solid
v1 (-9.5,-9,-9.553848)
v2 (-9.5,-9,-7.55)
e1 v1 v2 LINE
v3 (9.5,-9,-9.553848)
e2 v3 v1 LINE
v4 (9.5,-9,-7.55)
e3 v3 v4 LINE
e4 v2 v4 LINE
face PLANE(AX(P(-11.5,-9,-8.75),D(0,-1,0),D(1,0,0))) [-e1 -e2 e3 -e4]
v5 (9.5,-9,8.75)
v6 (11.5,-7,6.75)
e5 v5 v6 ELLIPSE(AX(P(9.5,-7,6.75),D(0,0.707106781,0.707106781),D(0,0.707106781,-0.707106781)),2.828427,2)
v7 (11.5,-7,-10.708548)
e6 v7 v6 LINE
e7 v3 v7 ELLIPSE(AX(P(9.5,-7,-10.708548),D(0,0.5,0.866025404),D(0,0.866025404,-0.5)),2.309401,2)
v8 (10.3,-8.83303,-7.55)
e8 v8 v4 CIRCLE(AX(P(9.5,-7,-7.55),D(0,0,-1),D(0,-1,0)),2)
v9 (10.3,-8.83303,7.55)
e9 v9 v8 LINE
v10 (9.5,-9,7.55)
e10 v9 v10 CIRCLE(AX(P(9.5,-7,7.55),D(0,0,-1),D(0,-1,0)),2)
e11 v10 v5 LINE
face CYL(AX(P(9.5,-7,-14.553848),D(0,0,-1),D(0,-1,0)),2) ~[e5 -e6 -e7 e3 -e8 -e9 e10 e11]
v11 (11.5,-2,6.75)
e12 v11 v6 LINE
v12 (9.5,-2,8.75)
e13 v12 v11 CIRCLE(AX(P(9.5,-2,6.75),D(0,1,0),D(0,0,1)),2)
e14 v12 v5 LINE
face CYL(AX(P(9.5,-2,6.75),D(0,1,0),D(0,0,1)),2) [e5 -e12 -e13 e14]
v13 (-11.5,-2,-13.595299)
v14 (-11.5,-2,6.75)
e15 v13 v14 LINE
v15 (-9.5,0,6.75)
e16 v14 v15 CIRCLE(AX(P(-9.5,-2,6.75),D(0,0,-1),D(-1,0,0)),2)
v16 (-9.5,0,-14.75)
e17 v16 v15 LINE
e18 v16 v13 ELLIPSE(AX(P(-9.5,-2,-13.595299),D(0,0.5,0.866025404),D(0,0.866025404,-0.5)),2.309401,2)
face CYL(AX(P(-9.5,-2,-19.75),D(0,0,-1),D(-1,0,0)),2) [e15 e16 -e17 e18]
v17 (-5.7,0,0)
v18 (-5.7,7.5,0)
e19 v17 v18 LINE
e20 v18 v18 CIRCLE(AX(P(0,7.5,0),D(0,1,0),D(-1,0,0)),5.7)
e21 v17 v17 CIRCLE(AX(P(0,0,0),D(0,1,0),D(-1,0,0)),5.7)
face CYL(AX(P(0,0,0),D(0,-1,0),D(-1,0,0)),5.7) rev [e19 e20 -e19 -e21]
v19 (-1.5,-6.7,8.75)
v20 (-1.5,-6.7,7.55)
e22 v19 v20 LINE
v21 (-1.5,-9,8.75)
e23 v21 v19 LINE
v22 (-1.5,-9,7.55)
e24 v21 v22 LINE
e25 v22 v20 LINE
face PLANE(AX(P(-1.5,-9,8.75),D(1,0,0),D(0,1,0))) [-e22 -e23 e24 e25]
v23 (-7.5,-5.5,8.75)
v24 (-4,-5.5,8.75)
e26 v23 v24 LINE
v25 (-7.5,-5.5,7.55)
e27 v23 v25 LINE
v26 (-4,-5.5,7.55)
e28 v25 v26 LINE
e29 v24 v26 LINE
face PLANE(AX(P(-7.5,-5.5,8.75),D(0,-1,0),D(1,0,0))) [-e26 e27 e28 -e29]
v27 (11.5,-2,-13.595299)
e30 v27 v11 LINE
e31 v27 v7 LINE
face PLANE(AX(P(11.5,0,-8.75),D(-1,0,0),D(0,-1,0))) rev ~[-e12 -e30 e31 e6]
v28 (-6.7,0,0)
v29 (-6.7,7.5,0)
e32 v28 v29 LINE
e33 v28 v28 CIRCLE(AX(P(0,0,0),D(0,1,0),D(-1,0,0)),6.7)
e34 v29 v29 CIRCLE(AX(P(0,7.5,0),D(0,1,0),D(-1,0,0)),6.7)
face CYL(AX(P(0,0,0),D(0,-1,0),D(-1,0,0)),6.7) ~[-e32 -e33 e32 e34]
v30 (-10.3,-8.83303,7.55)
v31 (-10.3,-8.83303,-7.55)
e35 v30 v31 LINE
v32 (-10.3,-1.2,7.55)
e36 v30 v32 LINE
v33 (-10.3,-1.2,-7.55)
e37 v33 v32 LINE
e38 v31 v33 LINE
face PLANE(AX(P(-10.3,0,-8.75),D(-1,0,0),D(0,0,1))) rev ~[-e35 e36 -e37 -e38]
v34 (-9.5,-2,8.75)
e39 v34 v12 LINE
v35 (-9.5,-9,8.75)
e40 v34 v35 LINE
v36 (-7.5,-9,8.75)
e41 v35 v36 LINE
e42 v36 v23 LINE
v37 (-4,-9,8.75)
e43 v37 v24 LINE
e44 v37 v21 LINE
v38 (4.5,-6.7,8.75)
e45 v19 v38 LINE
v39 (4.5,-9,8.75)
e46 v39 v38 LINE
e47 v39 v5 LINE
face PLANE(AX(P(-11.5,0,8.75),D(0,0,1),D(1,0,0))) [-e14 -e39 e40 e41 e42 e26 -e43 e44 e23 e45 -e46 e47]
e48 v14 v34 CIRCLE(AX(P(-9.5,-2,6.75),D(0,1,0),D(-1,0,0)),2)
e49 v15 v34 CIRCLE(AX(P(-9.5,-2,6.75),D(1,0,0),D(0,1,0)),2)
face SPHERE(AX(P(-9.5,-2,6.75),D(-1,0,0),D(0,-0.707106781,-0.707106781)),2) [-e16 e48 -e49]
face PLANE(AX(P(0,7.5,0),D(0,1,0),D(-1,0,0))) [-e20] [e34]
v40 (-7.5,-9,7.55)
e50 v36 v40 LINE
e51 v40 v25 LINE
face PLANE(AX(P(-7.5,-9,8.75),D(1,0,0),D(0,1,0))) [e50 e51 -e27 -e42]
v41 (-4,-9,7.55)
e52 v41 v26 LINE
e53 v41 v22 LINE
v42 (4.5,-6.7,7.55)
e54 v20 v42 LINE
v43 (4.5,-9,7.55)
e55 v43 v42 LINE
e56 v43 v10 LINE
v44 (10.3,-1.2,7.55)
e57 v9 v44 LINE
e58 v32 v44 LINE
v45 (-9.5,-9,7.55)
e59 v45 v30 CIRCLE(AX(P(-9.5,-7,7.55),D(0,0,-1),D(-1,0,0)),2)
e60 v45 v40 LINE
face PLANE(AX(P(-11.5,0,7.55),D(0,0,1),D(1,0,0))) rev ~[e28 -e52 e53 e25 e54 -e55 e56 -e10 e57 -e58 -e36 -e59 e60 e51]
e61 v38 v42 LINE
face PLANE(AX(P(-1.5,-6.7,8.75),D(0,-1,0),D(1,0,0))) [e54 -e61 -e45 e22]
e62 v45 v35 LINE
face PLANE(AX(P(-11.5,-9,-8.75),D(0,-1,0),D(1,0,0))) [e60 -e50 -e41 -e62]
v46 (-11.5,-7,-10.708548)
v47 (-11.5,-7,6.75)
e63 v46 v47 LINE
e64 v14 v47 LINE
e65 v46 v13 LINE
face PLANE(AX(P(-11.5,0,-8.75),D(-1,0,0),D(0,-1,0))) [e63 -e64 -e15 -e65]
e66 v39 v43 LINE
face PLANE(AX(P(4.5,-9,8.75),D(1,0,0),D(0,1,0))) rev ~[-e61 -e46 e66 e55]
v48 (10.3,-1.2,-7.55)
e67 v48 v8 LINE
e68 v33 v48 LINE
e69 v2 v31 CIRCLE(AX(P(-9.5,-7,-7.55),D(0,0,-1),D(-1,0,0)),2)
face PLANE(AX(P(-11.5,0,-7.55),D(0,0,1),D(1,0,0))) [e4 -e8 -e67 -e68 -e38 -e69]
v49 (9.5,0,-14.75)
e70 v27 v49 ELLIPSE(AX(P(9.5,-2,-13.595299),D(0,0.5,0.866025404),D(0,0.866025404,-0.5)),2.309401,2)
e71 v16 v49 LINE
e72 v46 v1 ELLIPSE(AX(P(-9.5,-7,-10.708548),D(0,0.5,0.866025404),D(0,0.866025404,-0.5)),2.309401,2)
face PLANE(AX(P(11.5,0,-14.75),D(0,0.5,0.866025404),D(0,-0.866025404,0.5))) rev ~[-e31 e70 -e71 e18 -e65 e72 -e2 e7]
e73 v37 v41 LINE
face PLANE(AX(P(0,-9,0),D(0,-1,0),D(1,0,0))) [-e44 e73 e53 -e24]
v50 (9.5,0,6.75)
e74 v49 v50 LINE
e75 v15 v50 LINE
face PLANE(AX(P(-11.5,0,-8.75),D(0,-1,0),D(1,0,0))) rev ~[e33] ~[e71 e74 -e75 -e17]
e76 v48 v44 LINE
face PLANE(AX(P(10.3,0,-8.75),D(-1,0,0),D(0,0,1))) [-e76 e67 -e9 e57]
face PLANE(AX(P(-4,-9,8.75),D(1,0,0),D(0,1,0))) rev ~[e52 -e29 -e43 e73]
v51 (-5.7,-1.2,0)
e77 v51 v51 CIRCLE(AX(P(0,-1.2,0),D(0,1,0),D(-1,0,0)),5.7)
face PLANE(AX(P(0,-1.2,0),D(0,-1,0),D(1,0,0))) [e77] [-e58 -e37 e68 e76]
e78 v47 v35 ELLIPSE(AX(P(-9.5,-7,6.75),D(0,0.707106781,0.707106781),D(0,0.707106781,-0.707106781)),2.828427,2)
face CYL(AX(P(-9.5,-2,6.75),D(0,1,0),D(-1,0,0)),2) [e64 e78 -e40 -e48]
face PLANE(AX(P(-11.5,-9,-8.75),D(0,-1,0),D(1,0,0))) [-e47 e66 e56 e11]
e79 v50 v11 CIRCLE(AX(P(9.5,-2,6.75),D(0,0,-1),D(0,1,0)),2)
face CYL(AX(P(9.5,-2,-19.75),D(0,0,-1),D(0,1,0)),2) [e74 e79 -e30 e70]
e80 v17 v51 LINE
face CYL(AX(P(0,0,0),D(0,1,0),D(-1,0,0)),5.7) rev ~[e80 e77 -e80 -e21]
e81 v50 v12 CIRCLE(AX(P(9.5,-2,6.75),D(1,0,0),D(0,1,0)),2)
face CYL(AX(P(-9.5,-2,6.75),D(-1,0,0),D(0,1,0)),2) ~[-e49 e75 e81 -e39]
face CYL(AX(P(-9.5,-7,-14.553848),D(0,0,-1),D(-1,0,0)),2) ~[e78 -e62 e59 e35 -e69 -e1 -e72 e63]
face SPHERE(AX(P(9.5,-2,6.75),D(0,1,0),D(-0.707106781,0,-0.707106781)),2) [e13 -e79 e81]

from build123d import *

# Parameters (mm, degrees)
F0_W          = 23
F0_H          = 17.5
F1_DEPTH      = 9
F2_T          = -1.2
F3_R          = 5.7
F4_DEPTH      = 3
F3_R_2        = 6.7
F5_DEPTH      = 7.5
F6_W          = 6
F6_H          = 2.3
F6_W_2        = 3.5
F6_H_2        = 3.5
F7_DEPTH      = 4
F8_DEPTH      = 6
F10_DEPTH     = 30
F11_T1_DEPTH  = 19
F11_T3_DEPTH  = 26.5
F11_T5_DEPTH  = 12
F11_T7_DEPTH  = 28.3038475773
F11_S11_W     = 2
F11_S11_H     = 2
F11_T12_DEPTH = 2
F11_S17_W     = 2
F11_S17_H     = 2
F11_T18_DEPTH = 2


# Not quite as in the source:
# - a fillet or chamfer that OpenCascade refuses, or shapes differently, is made with other operations: its cross-section is extruded or revolved along the edge and cut away or added


with BuildPart() as f1:
    # F0 (on Front) → F1 (new body)
    with BuildSketch(Plane.XZ):
        Rectangle(F0_W, F0_H)
    extrude(amount=F1_DEPTH)

    # F2
    f2_openings = [f1.faces().sort_by_distance(p)[0] for p in [
        (0, -9, 0),
    ]]
    offset(amount=F2_T, openings=f2_openings)

    # F3 (on face) → F4 (cut)
    with BuildSketch(Plane(origin=(0, 0, 0), x_dir=(-1, 0, 0), z_dir=(0, 1, 0))):
        Circle(F3_R)
    extrude(amount=-F4_DEPTH, mode=Mode.SUBTRACT)

    # F3 (on face) → F5 (join)
    with BuildSketch(Plane(origin=(0, 0, 0), x_dir=(-1, 0, 0), z_dir=(0, 1, 0))):
        Circle(F3_R_2)
        Circle(F3_R, mode=Mode.SUBTRACT)
    extrude(amount=F5_DEPTH)

    # F6 (on face) → F7 (cut)
    with BuildSketch(Plane.XY.offset(8.75)):
        with Locations((1.5, -7.85)):
            Rectangle(F6_W, F6_H)
        with Locations((-5.75, -7.25)):
            Rectangle(F6_W_2, F6_H_2)
    extrude(amount=-F7_DEPTH, mode=Mode.SUBTRACT)

    # F8 (add): a face of the model
    f8_faces = [f1.faces().sort_by_distance(p)[0] for p in [
        (0, -4.5, -8.75),
    ]]
    extrude(f8_faces, amount=F8_DEPTH)

    # F9 (on face) → F10 (cut)
    with BuildSketch(Plane.YZ.offset(11.5)):
        Polygon((-9, -14.75), (0, -14.75), (-9, -9.5538475773), align=None)
    extrude(amount=-F10_DEPTH, mode=Mode.SUBTRACT)

    # F11: fillet of radius 2 on 7 edges, made by hand

    # F11_s2 → F11_t1 (cut)
    with BuildSketch(Plane.YZ.offset(-9.5)):
        with BuildLine():
            ThreePointArc((0, 6.75), (-0.5857864376, 8.1642135624), (-2, 8.75))
            Line((-2, 8.75), (0, 8.75))
            Line((0, 8.75), (0, 6.75))
        make_face()
    extrude(amount=F11_T1_DEPTH, mode=Mode.SUBTRACT)

    # F11_s4 → F11_t3 (cut)
    with BuildSketch(Plane.XY.offset(-19.75)):
        with BuildLine():
            ThreePointArc((-11.5, -2), (-10.9142135624, -0.5857864376), (-9.5, 0))
            Line((-9.5, 0), (-11.5, 0))
            Line((-11.5, 0), (-11.5, -2))
        make_face()
        with BuildLine():
            ThreePointArc((9.5, 0), (10.9142135624, -0.5857864376), (11.5, -2))
            Line((11.5, -2), (11.5, 0))
            Line((11.5, 0), (9.5, 0))
        make_face()
    extrude(amount=F11_T3_DEPTH, mode=Mode.SUBTRACT)

    # F11_s6 → F11_t5 (cut)
    with BuildSketch(Plane.XZ.offset(2)):
        with BuildLine():
            ThreePointArc((9.5, 8.75), (10.9142135624, 8.1642135624), (11.5, 6.75))
            Line((11.5, 6.75), (11.5, 8.75))
            Line((11.5, 8.75), (9.5, 8.75))
        make_face()
        with BuildLine():
            ThreePointArc((-11.5, 6.75), (-10.9142135624, 8.1642135624), (-9.5, 8.75))
            Line((-9.5, 8.75), (-11.5, 8.75))
            Line((-11.5, 8.75), (-11.5, 6.75))
        make_face()
    extrude(amount=F11_T5_DEPTH, mode=Mode.SUBTRACT)

    # F11_s8 → F11_t7 (cut)
    with BuildSketch(Plane.XY.offset(-14.5538475773)):
        with BuildLine():
            ThreePointArc((-11.5, -7), (-10.9142135624, -8.4142135624), (-9.5, -9))
            Line((-9.5, -9), (-11.5, -9))
            Line((-11.5, -9), (-11.5, -7))
        make_face()
        with BuildLine():
            ThreePointArc((9.5, -9), (10.9142135624, -8.4142135624), (11.5, -7))
            Line((11.5, -7), (11.5, -9))
            Line((11.5, -9), (9.5, -9))
        make_face()
    extrude(amount=F11_T7_DEPTH, mode=Mode.SUBTRACT)


with BuildPart() as f11_tool10:
    # F11_s11 → F11_t12 (new body)
    with BuildSketch(Plane.XZ.offset(2)):
        with Locations((10.5, 7.75)):
            Rectangle(F11_S11_W, F11_S11_H)
    extrude(amount=-F11_T12_DEPTH)

    # F11_s13 → F11_t14 (revolve, cut)
    with BuildSketch(Plane(origin=(9.5, -2, 6.75), x_dir=(-0.7071067812, 0, -0.7071067812), z_dir=(0.7071067812, 0, -0.7071067812))):
        with BuildLine():
            ThreePointArc((0, -2), (2, 0), (0, 2))
            Line((0, 2), (0, -2))
        make_face()
    revolve(axis=Axis((9.5, -2, 6.75), (0, 1, 0)), mode=Mode.SUBTRACT)


with BuildPart() as f1_1:
    add(f1.part)

    # F11_t9: cut F11_tool10
    add(f11_tool10.part, mode=Mode.SUBTRACT)


with BuildPart() as f11_tool16:
    # F11_s17 → F11_t18 (new body)
    with BuildSketch(Plane.YZ.offset(-9.5)):
        with Locations((-1, 7.75)):
            Rectangle(F11_S17_W, F11_S17_H)
    extrude(amount=-F11_T18_DEPTH)

    # F11_s19 → F11_t20 (revolve, cut)
    with BuildSketch(Plane(origin=(-9.5, -2, 6.75), x_dir=(0, -0.7071067812, -0.7071067812), z_dir=(0, 0.7071067812, -0.7071067812))):
        with BuildLine():
            ThreePointArc((0, -2), (2, 0), (0, 2))
            Line((0, 2), (0, -2))
        make_face()
    revolve(axis=Axis((-9.5, -2, 6.75), (-1, 0, 0)), mode=Mode.SUBTRACT)


with BuildPart() as f1_2:
    add(f1_1.part)

    # F11_t15: cut F11_tool16
    add(f11_tool16.part, mode=Mode.SUBTRACT)


solid = f1_2.part
